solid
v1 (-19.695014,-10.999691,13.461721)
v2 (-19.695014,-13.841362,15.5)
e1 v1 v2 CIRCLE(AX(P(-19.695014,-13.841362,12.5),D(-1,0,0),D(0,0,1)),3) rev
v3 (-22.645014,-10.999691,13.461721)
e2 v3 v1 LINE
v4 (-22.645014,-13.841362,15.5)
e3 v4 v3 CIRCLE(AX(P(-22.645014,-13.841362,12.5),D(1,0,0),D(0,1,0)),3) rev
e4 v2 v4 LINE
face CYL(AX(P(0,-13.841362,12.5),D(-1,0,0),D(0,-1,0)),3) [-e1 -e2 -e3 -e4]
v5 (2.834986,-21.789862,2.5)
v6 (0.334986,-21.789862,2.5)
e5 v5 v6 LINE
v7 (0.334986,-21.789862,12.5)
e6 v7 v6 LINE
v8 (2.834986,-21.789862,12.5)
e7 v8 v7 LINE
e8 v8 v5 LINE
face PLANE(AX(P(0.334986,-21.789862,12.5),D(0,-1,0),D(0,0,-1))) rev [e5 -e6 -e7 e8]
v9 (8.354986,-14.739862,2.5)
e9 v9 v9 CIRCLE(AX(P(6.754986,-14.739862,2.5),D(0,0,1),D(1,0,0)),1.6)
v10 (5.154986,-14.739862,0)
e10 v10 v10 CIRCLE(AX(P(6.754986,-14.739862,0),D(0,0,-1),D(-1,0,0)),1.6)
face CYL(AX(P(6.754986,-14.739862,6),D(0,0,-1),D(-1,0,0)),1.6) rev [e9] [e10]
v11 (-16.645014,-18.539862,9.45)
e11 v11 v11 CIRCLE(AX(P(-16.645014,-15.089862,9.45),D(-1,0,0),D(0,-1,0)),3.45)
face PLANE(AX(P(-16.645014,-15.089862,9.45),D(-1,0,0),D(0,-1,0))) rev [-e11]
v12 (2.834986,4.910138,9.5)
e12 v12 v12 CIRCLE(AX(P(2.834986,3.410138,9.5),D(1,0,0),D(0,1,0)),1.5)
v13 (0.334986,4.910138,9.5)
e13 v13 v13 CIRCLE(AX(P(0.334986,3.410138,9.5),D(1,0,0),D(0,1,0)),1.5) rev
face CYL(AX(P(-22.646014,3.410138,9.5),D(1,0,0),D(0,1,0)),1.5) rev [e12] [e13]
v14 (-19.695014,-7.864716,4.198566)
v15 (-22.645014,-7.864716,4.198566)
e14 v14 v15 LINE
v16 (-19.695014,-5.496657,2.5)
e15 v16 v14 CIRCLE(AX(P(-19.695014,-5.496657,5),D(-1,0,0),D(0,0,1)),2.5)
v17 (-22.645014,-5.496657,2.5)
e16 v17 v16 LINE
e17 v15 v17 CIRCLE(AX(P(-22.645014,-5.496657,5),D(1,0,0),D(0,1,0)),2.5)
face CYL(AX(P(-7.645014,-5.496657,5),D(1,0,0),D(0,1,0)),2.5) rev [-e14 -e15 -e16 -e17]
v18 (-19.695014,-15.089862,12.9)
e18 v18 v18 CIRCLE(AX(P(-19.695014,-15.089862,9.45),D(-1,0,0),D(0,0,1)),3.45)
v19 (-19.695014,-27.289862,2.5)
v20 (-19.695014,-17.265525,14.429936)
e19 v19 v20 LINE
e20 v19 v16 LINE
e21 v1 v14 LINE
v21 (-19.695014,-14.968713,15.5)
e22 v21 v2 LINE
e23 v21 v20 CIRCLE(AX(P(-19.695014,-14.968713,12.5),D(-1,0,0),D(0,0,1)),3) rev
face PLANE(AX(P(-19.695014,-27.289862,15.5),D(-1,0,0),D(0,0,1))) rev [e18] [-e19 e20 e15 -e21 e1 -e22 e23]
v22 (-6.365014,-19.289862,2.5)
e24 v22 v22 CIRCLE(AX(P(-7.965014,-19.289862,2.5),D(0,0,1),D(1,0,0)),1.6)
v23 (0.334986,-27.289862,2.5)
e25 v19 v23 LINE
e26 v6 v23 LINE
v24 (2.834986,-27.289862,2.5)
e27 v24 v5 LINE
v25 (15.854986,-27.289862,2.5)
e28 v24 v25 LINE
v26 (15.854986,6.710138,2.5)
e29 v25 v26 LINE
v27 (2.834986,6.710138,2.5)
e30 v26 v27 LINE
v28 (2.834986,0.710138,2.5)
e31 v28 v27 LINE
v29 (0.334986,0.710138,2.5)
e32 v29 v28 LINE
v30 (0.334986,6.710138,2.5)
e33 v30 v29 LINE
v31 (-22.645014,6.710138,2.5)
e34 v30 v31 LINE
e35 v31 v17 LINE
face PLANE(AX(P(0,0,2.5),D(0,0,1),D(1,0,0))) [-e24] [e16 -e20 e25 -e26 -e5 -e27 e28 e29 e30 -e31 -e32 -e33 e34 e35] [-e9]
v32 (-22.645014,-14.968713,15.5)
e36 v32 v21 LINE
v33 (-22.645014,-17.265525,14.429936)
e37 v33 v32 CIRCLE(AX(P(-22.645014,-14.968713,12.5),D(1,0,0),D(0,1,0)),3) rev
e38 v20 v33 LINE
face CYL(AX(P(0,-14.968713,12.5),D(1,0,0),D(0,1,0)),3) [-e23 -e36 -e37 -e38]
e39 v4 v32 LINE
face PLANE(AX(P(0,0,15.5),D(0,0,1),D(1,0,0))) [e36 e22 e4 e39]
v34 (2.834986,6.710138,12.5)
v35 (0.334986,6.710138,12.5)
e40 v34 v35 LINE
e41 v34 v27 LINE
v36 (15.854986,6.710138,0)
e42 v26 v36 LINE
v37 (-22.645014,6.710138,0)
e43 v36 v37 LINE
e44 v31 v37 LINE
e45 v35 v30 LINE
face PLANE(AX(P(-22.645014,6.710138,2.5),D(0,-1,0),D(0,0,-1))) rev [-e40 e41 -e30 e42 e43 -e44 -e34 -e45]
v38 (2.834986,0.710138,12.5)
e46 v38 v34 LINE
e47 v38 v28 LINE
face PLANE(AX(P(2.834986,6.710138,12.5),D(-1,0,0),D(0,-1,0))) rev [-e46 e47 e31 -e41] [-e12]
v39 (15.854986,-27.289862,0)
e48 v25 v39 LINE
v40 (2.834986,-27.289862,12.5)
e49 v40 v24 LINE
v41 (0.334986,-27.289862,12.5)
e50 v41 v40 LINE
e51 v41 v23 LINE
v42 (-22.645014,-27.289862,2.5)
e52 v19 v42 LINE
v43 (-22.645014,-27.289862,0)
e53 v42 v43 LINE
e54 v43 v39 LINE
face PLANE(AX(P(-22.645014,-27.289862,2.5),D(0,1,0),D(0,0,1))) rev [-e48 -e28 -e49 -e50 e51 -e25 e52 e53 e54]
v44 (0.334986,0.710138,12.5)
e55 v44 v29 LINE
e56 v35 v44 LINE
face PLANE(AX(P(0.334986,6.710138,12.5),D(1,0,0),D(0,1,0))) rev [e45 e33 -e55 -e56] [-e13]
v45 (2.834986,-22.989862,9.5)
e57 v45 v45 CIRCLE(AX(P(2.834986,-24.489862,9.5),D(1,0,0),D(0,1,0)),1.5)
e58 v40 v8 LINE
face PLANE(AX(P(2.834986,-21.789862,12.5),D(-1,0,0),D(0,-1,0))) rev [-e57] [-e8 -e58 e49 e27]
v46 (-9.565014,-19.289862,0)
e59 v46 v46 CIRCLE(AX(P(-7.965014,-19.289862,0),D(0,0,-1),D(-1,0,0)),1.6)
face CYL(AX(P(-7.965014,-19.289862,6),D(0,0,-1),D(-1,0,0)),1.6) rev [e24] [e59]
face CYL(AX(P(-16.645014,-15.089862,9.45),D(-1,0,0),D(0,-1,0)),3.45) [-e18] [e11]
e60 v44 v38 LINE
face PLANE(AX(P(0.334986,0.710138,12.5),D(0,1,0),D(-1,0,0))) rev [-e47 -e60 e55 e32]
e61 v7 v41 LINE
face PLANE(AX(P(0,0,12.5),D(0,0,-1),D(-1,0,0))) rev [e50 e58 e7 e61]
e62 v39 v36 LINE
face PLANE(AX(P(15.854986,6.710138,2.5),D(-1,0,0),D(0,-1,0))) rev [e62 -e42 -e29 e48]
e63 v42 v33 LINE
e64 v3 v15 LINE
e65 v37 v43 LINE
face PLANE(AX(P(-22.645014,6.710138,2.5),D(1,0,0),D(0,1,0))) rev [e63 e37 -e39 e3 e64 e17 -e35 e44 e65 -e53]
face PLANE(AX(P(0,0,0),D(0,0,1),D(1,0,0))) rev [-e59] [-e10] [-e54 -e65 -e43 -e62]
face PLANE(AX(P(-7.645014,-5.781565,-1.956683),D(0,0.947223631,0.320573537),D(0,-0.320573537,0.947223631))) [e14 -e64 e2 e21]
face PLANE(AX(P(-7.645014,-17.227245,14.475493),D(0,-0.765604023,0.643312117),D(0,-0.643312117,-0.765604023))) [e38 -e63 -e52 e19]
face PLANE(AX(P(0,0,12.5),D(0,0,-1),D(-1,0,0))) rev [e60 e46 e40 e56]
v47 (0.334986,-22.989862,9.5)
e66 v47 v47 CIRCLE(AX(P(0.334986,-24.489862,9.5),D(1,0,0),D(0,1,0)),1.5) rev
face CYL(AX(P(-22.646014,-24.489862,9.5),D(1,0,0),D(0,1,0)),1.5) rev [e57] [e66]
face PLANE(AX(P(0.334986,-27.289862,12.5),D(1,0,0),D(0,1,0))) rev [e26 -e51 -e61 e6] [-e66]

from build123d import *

# Parameters (mm, degrees)
ESBO_O1_W                = 38.5
ESBO_O1_H                = 34
RESSALTO_EXTRUS_O1_DEPTH = 2.5
ESBO_O2_W                = 2.5
ESBO_O2_H                = 6
ESBO_O2_H_2              = 5.5
RESSALTO_EXTRUS_O2_DEPTH = 10
CORTE_EXTRUS_O1_REACH    = 41.373
ESBO_O3_R                = 1.5
ESBO_O4_W                = 2.95
ESBO_O4_H                = 20
RESSALTO_EXTRUS_O3_DEPTH = 13
ESBO_O5_R                = 3.45
CORTE_EXTRUS_O2_DEPTH    = 15
FILETE1_R                = 3
FILETE2_R                = 2.5
ESBO_O7_R                = 3.45
RESSALTO_EXTRUS_O5_DEPTH = 6
ESBO_O8_R                = 1.6
CORTE_EXTRUS_O3_DEPTH    = 6


with BuildPart() as part:
    # Esboço1 → Ressalto-extrusão1 (new body)
    with BuildSketch(Plane.XY):
        with Locations((-3.395014232, -10.289862205)):
            Rectangle(ESBO_O1_W, ESBO_O1_H)
    extrude(amount=RESSALTO_EXTRUS_O1_DEPTH)

    # Esboço2 → Ressalto-extrusão2 (add)
    with BuildSketch(Plane.XY.offset(2.5)):
        with Locations((1.584985768, 3.710137795)):
            Rectangle(ESBO_O2_W, ESBO_O2_H)
        with Locations((1.584985768, -24.539862205)):
            Rectangle(ESBO_O2_W, ESBO_O2_H_2)
    extrude(amount=RESSALTO_EXTRUS_O2_DEPTH)

    # Esboço3 → Corte-extrusão1 (cut, up to next)
    with BuildSketch(Plane(origin=(2.834985768, 0, 0), x_dir=(0, 0, -1), z_dir=(1, 0, 0)), mode=Mode.PRIVATE) as corte_extrus_o1_sk1:
        with Locations(Location((-9.5, 3.410137795, 0), (0, 0, 90))):
            Circle(ESBO_O3_R)
    corte_extrus_o1_tool1 = extrude(corte_extrus_o1_sk1.sketch, amount=-CORTE_EXTRUS_O1_REACH, mode=Mode.PRIVATE) & part.part
    # Esboço3 → Corte-extrusão1 (cut, up to next)
    with BuildSketch(Plane(origin=(2.834985768, 0, 0), x_dir=(0, 0, -1), z_dir=(1, 0, 0)), mode=Mode.PRIVATE) as corte_extrus_o1_sk2:
        with Locations(Location((-9.5, -24.489862205, 0), (0, 0, 90))):
            Circle(ESBO_O3_R)
    corte_extrus_o1_tool2 = extrude(corte_extrus_o1_sk2.sketch, amount=-CORTE_EXTRUS_O1_REACH, mode=Mode.PRIVATE) & part.part
    add(corte_extrus_o1_tool1.solids().sort_by_distance((2.834986, 3.410138, 9.5))[0], mode=Mode.SUBTRACT)
    add(corte_extrus_o1_tool2.solids().sort_by_distance((2.834986, -24.489862, 9.5))[0], mode=Mode.SUBTRACT)

    # Esboço4 → Ressalto-extrusão3 (add)
    with BuildSketch(Plane.XY.offset(2.5)):
        with Locations((-21.170014232, -17.289862205)):
            Rectangle(ESBO_O4_W, ESBO_O4_H)
    extrude(amount=RESSALTO_EXTRUS_O3_DEPTH)

    # Esboço5 → Corte-extrusão2 (cut)
    with BuildSketch(Plane.ZY.offset(22.645014232)):
        Polygon((2.5, -7.289862205), (15.222036194, -11.595443281), (15.5, -11.689515935), (15.5, -7.289862205), align=None)
        Polygon((15.222036194, -16.59994967), (2.5, -27.289862205), (15.5, -27.289862205), (15.5, -16.36638574), align=None)
        with Locations(Location((9.45, -15.089862205, 0), (0, 0, 270))):
            Circle(ESBO_O5_R)
    extrude(amount=-CORTE_EXTRUS_O2_DEPTH, mode=Mode.SUBTRACT)

    # Filete1
    filete1_edges = [part.edges().sort_by_distance(p)[0] for p in [
        (-21.170014232, -11.689515935, 15.5),
        (-21.170014232, -16.36638574, 15.5),
    ]]
    fillet(filete1_edges, radius=FILETE1_R)

    # Filete2
    # the kernel refuses this fillet: 2.5 mm, written as the material it adds along each edge
    with BuildSketch(Plane(origin=(-19.695014232, -7.289862205, 2.5), x_dir=(0, -0.32057353707536407, 0.947223631106715), z_dir=(-1, 0, 0))) as filete2_piece_1:
        with BuildLine():
            CenterArc((FILETE2_R * 0.717282002488, FILETE2_R), FILETE2_R, 198.697613514, 71.302386486)
            Line((-FILETE2_R * 0.229941628618, FILETE2_R * 0.679426462925), (0, 0))
            Line((0, 0), (FILETE2_R * 0.717282002488, 0))
        make_face()
    extrude(amount=2.95)

    # Esboço7 → Ressalto-extrusão5 (add)
    with BuildSketch(Plane.ZY.offset(22.645014232)):
        with Locations(Location((9.45, -15.089862205, 0), (0, 0, 270))):
            Circle(ESBO_O7_R)
    extrude(amount=-RESSALTO_EXTRUS_O5_DEPTH)

    # Esboço8 → Corte-extrusão3 (cut)
    with BuildSketch(Plane(origin=(0, 0, 0), x_dir=(-1, 0, 0), z_dir=(0, 0, -1))):
        with Locations((7.965014232, -19.289862205)):
            Circle(ESBO_O8_R)
        with Locations((-6.754985768, -14.739862205)):
            Circle(ESBO_O8_R)
    extrude(amount=-CORTE_EXTRUS_O3_DEPTH, mode=Mode.SUBTRACT)


solid = part.part
